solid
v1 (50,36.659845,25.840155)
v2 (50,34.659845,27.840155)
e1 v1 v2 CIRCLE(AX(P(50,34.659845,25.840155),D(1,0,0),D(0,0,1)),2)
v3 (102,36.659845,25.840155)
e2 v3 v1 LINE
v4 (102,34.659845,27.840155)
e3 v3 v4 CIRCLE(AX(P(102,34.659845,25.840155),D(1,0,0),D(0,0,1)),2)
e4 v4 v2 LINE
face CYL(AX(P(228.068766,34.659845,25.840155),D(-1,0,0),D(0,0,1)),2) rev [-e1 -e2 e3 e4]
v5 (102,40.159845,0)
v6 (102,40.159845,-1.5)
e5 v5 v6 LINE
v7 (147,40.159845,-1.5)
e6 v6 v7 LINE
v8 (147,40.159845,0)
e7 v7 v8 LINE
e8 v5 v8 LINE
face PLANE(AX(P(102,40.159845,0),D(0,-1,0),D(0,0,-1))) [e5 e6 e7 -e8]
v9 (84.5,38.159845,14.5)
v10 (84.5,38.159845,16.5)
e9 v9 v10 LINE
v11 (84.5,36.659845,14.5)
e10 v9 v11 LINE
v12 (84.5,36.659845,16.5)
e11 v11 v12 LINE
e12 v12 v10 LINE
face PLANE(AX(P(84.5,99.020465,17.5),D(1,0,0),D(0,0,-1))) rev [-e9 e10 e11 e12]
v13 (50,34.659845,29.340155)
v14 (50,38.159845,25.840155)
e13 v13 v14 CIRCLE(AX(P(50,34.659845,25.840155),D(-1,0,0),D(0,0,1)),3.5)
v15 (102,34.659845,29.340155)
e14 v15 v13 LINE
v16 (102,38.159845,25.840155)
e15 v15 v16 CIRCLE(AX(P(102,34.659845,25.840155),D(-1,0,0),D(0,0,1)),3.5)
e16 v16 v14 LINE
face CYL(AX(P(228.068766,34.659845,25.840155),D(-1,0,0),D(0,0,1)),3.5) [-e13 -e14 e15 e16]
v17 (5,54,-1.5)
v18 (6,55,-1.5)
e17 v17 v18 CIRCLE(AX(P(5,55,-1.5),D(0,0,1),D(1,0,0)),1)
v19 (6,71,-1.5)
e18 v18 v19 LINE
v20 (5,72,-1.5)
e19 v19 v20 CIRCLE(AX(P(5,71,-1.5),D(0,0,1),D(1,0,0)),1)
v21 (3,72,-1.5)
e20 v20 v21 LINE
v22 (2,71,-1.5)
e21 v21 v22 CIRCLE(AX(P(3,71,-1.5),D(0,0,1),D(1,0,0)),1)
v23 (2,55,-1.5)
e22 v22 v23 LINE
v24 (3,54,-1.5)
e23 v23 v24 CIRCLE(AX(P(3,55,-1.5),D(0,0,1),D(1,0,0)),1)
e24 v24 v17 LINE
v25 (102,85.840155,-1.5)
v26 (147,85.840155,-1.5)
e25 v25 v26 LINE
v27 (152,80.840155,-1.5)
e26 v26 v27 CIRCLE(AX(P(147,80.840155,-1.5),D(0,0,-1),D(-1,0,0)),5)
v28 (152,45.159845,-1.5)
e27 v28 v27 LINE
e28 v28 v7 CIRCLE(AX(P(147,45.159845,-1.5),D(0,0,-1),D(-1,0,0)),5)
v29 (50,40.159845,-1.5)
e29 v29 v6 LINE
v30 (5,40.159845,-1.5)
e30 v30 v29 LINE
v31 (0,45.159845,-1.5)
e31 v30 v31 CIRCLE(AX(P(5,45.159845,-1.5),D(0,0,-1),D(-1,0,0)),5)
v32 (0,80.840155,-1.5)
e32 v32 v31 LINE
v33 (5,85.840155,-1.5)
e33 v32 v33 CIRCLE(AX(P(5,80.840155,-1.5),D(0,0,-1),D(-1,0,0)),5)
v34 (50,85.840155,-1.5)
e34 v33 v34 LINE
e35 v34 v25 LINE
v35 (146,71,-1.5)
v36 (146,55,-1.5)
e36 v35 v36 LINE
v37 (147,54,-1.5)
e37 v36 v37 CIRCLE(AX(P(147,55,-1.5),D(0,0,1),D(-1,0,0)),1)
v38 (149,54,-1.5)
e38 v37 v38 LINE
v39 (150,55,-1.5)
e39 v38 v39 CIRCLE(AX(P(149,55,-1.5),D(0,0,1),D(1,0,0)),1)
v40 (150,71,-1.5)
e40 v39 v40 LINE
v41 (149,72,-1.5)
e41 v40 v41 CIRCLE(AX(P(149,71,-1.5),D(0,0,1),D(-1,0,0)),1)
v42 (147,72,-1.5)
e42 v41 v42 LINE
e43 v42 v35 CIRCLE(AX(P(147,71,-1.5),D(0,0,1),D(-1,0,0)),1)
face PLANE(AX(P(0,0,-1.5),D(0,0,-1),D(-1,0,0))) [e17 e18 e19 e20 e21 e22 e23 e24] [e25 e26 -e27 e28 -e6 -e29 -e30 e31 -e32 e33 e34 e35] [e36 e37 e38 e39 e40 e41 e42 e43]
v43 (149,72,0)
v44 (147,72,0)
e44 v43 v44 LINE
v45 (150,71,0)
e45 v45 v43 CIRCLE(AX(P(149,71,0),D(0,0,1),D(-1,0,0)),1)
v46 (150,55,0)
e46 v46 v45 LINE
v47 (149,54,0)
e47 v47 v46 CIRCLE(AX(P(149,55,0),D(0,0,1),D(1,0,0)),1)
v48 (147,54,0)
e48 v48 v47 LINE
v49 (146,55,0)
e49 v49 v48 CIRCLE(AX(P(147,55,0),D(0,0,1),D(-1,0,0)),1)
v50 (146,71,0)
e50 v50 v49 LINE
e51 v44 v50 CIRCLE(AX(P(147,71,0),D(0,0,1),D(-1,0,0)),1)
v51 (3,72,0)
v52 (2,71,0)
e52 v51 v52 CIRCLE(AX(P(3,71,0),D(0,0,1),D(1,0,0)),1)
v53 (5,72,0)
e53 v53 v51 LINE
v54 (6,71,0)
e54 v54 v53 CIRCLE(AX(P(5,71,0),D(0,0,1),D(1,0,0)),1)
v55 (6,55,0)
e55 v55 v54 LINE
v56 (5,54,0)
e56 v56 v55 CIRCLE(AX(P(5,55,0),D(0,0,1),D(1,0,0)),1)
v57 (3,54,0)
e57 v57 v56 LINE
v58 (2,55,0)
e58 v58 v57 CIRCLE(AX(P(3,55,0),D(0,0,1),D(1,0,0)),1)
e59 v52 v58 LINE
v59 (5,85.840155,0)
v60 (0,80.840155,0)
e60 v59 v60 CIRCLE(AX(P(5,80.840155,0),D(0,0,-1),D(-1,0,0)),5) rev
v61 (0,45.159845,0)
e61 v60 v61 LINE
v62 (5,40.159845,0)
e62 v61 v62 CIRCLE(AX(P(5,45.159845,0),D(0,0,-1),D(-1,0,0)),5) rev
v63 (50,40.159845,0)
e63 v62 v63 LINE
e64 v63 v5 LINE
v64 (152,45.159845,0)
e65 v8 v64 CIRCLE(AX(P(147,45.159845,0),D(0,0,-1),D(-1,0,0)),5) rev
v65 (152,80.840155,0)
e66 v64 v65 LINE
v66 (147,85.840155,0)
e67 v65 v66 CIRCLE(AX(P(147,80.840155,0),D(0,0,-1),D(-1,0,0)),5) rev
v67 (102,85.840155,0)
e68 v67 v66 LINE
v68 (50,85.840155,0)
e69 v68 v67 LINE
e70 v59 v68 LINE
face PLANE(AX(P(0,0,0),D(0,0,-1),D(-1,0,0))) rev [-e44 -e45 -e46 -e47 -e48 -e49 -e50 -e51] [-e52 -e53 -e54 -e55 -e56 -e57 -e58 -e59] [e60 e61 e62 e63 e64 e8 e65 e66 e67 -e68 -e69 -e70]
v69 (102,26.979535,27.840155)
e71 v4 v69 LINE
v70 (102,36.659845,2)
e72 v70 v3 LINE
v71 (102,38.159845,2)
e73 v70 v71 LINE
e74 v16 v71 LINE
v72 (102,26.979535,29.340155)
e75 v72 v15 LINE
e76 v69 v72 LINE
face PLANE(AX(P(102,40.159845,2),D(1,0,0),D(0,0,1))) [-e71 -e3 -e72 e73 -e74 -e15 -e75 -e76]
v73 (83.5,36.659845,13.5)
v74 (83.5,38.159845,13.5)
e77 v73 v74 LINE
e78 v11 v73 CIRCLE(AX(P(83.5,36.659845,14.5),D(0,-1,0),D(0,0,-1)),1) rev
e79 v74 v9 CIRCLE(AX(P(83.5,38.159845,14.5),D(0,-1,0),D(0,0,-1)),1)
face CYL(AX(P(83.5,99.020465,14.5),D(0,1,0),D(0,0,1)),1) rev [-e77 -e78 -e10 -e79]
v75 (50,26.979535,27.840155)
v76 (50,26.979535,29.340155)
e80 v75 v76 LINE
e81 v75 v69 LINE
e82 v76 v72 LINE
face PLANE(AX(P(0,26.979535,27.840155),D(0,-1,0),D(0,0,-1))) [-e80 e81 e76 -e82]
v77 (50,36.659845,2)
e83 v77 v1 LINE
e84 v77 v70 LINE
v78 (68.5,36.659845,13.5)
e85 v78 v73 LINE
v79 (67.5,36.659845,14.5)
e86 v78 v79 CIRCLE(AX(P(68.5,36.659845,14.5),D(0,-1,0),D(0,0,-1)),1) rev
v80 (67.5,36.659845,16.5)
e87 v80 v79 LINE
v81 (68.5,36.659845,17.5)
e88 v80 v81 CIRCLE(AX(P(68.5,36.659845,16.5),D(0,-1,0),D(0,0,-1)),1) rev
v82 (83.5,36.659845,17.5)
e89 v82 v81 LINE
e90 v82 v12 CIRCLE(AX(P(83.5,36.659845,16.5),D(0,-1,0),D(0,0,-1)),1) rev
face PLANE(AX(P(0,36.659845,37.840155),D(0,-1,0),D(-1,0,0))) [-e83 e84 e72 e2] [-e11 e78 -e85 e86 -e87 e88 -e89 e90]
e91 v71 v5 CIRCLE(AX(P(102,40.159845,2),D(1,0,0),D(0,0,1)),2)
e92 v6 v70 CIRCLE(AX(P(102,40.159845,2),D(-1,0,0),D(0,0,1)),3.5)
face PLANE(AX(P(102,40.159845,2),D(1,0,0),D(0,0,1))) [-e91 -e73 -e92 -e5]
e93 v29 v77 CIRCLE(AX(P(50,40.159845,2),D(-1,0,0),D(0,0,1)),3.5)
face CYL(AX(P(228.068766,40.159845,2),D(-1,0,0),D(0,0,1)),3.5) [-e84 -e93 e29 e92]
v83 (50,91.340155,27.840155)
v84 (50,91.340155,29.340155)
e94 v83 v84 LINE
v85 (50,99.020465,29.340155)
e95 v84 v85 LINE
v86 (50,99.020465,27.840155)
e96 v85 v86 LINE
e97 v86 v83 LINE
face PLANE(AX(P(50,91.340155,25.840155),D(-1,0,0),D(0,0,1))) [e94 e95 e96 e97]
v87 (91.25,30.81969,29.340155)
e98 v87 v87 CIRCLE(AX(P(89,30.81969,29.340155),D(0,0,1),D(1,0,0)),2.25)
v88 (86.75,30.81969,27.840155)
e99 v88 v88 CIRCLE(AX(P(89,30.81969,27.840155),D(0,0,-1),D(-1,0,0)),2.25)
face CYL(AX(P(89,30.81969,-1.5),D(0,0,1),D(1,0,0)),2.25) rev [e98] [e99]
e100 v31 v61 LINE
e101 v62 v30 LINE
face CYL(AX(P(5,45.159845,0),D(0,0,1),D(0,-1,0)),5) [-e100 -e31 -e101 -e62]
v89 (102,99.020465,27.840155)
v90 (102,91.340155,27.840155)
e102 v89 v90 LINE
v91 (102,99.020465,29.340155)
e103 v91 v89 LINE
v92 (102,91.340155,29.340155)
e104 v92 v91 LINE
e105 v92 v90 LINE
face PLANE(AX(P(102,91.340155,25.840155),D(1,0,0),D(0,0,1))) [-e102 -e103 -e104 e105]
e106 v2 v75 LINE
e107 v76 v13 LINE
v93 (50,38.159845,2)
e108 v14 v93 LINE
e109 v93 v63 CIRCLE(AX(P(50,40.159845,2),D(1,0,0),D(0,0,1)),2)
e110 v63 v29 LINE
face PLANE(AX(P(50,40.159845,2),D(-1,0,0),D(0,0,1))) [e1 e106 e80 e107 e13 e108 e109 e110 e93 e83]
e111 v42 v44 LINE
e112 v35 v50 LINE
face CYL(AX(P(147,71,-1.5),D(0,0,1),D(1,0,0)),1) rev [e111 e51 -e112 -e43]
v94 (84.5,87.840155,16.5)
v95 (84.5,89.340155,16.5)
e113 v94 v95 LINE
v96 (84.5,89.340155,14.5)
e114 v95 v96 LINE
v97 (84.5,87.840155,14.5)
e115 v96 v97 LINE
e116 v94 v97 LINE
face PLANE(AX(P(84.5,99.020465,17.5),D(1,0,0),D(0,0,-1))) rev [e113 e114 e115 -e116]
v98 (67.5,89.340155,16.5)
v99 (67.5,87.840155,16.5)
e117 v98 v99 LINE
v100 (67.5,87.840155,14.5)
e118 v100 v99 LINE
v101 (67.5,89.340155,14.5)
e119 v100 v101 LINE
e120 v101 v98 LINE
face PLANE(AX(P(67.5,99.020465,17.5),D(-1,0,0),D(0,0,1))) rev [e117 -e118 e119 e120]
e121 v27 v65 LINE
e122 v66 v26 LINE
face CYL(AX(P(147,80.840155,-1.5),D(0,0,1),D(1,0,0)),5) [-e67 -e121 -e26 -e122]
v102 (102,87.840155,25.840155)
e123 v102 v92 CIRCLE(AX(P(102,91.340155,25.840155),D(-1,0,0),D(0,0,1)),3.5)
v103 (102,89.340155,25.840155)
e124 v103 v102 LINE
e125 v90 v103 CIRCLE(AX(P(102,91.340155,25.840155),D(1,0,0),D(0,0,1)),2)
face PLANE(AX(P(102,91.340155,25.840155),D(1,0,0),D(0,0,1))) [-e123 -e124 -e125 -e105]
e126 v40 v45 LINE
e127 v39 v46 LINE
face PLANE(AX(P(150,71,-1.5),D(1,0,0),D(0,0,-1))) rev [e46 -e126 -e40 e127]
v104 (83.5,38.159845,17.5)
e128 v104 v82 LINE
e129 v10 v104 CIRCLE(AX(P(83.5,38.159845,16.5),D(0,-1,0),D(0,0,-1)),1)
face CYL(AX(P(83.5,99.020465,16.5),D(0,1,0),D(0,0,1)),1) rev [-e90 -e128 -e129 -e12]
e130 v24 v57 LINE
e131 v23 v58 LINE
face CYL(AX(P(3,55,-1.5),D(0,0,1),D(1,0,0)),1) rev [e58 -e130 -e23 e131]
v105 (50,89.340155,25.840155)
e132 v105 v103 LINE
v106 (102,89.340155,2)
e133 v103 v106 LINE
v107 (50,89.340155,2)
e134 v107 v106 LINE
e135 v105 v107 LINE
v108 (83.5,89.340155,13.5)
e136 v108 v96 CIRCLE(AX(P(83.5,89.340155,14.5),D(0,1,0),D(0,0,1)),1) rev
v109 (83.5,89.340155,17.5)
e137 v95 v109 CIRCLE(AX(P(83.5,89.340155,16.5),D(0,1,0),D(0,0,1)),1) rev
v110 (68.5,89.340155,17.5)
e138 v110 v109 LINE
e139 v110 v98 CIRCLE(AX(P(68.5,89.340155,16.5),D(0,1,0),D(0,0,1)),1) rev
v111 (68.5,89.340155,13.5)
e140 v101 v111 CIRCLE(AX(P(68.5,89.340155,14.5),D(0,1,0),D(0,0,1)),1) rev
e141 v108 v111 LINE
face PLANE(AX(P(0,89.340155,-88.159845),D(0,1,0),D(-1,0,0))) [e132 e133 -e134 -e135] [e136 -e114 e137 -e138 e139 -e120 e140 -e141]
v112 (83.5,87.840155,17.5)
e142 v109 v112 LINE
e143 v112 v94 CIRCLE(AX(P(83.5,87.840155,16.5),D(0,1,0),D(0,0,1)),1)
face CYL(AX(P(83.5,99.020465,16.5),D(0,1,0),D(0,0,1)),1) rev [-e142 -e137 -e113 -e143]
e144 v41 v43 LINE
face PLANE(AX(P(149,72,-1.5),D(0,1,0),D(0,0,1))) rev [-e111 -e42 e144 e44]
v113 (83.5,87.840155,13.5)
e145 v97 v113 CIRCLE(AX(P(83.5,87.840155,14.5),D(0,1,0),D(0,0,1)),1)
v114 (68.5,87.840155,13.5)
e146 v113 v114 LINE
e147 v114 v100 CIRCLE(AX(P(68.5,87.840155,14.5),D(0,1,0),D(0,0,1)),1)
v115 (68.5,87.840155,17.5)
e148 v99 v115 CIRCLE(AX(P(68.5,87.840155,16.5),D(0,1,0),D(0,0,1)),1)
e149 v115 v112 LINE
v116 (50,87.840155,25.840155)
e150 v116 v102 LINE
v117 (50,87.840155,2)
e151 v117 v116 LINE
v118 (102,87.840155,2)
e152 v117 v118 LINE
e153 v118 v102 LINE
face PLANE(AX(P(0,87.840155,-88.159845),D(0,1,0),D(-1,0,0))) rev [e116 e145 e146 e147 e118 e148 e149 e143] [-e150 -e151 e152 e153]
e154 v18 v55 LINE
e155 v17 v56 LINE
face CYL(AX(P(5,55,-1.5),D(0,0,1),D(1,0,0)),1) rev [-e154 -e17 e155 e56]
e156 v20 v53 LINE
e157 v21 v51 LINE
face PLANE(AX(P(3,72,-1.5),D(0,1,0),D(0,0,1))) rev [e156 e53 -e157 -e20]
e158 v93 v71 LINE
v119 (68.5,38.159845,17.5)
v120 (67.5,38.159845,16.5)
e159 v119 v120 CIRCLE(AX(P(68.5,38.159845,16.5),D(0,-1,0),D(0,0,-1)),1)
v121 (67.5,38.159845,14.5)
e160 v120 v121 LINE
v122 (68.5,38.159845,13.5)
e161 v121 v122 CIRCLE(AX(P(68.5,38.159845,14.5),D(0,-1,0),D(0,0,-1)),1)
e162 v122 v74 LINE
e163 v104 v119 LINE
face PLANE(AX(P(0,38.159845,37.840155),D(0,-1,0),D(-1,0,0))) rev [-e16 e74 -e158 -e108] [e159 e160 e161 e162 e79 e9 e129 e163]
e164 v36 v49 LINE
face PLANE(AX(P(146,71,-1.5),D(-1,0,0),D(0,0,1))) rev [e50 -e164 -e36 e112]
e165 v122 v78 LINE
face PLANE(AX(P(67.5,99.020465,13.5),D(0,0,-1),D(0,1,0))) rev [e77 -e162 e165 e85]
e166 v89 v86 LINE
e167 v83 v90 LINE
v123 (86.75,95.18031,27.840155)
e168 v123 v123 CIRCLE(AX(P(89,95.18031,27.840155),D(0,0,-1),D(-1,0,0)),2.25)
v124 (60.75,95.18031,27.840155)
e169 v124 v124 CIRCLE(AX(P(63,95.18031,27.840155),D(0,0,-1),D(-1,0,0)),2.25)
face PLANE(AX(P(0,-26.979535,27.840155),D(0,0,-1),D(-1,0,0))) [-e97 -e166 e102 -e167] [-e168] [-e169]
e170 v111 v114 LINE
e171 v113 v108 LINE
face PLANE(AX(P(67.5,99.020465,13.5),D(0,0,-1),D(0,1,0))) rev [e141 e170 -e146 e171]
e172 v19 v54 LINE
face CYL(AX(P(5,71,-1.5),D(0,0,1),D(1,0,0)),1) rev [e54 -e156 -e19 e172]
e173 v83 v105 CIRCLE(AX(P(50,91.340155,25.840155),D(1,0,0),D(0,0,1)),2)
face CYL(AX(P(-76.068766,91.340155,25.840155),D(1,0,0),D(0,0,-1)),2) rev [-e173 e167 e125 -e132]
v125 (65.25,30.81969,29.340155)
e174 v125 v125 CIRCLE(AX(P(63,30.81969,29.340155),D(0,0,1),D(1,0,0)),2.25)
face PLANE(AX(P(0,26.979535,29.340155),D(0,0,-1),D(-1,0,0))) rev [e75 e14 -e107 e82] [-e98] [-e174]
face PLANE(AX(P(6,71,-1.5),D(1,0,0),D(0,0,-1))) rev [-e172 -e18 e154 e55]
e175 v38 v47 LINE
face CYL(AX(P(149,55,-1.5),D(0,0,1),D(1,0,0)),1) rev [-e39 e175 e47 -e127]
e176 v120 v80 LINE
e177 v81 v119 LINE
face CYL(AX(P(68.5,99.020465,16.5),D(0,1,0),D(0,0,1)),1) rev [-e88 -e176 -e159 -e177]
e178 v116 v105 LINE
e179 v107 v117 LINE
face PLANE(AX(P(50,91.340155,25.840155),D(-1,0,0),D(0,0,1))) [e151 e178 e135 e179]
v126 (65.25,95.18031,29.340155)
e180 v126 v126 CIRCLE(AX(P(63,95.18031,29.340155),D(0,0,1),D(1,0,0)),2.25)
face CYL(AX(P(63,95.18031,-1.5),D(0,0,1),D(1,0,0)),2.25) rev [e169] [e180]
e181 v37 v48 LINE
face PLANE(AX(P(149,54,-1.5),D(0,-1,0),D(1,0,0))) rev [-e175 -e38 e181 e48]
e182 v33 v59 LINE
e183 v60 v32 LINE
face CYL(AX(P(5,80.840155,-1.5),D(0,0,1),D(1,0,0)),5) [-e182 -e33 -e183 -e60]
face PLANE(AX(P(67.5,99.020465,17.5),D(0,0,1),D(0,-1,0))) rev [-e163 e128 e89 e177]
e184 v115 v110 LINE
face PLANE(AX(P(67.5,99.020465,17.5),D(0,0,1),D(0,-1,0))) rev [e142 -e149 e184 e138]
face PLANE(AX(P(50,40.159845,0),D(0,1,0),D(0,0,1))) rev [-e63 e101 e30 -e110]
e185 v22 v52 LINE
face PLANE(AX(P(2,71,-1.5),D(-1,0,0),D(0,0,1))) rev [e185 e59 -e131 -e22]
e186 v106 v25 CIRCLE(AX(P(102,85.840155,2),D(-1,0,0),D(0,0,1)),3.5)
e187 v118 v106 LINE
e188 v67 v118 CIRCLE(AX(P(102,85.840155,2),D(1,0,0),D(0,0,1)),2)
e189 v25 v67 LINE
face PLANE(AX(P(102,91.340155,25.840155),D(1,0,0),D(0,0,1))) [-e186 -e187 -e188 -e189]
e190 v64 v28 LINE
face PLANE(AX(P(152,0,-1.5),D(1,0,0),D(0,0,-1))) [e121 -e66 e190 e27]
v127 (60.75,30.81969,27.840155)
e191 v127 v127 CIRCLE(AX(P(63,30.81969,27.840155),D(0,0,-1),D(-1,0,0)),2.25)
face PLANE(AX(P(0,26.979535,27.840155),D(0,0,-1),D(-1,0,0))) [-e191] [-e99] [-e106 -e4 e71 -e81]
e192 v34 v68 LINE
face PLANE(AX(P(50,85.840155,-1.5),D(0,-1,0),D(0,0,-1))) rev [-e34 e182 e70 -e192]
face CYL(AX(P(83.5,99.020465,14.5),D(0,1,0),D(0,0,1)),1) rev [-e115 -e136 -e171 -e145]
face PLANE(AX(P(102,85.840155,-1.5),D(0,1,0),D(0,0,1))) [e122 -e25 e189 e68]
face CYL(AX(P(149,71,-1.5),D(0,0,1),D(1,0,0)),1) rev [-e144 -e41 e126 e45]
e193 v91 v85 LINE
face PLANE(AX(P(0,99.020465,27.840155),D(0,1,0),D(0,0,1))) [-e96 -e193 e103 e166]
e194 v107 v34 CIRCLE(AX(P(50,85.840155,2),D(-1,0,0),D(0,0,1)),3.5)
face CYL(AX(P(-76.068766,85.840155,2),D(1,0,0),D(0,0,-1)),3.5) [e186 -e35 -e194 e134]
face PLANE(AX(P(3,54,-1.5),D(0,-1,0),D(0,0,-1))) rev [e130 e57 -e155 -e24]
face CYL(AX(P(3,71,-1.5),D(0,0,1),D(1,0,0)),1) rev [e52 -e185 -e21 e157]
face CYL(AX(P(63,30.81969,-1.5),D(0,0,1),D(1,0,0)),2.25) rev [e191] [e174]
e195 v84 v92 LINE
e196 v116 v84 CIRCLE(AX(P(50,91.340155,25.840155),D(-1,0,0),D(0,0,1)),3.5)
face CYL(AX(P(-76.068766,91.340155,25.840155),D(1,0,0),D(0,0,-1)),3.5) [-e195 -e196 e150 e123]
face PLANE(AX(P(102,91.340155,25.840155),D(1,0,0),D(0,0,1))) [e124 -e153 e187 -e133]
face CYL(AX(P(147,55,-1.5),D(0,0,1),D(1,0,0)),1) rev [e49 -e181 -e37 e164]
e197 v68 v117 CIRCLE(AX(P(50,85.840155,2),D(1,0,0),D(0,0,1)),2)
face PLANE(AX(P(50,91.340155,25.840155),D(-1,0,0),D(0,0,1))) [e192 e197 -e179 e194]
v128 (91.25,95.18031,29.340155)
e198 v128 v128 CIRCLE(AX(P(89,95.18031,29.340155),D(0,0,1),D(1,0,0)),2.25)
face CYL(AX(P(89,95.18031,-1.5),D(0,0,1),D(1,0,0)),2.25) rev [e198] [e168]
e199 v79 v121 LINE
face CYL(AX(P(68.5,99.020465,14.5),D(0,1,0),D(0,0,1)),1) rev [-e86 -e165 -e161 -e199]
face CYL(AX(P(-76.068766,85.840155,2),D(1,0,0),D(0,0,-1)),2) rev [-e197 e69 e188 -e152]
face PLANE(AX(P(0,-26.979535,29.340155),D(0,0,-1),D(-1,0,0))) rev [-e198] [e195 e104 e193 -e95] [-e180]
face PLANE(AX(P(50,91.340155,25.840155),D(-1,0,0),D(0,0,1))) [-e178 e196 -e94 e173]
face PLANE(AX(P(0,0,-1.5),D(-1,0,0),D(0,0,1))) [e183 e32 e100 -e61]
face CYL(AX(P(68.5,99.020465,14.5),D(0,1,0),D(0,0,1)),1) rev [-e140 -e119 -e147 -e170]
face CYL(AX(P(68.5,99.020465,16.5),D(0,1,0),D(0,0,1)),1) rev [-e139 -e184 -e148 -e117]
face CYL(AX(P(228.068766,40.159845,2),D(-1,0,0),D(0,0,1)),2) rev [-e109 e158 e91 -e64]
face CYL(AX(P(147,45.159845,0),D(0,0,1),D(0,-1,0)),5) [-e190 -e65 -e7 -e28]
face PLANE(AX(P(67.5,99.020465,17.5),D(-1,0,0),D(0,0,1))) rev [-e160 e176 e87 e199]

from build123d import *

# Parameters (mm, degrees)
SKIZZE1_W                            = 152
SKIZZE1_H                            = 126
BASIS_BLECH1_DEPTH                   = 1.5
SKIZZIERTE_BIEGUNG2_DEPTH            = 152
SKIZZIERTE_BIEGUNG2_2_DEPTH          = 152
SKIZZIERTE_BIEGUNG3_DEPTH            = 152
SKIZZIERTE_BIEGUNG3_2_DEPTH          = 152
SKIZZIERTE_BIEGUNG4_DEPTH            = 152
SKIZZIERTE_BIEGUNG4_2_DEPTH          = 152
SCHNITT_LINEAR_AUSTRAGEN1_DEPTH      = 50
SCHNITT_LINEAR_AUSTRAGEN2_DEPTH      = 167.894252898
SCHNITT_LINEAR_AUSTRAGEN2_DEPTH_BACK = 167.894252898
SKIZZE15_W                           = 17
SKIZZE15_H                           = 4
SKIZZE22_R                           = 2.25
SCHNITT_LINEAR_AUSTRAGEN4_DEPTH      = 185.011324876
VERRUNDUNG3_R                        = 1
VERRUNDUNG4_R                        = 5
SCHNITT_LINEAR_AUSTRAGEN5_DEPTH      = 184.765876096


# Read off the part's stored shape, not the designer's step: Skizzierte Biegung2, Skizzierte Biegung3, Skizzierte Biegung4
# Sheet-metal steps are written as plain solids
with BuildPart() as part:
    # Skizze1 → Basis-Blech1 (new body)
    with BuildSketch(Plane.XY):
        with Locations((76, 63)):
            Rectangle(SKIZZE1_W, SKIZZE1_H)
    extrude(amount=-BASIS_BLECH1_DEPTH)

    # Skizzierte Biegung2 outline → Skizzierte Biegung2 (cut)
    with BuildSketch(Plane.YZ):
        with BuildLine():
            ThreePointArc((88.712436374, 0), (87.460340225, -1.102418411), (85.840155051, -1.5))
            Line((85.840155051, -1.5), (126, -1.5))
            Line((126, -1.5), (126, 0))
            Line((126, 0), (88.712436374, 0))
        make_face()
        with BuildLine():
            Line((0, -1.5), (40.159844949, -1.5))
            ThreePointArc((40.159844949, -1.5), (38.539659775, -1.102418411), (37.287563626, 0))
            Line((37.287563626, 0), (0, 0))
            Line((0, 0), (0, -1.5))
        make_face()
    extrude(amount=SKIZZIERTE_BIEGUNG2_DEPTH, mode=Mode.SUBTRACT)

    # Skizzierte Biegung2 2 outline → Skizzierte Biegung2 2 (add)
    with BuildSketch(Plane.YZ):
        with BuildLine():
            Line((85.840155051, 0), (88.712436374, 0))
            ThreePointArc((88.712436374, 0), (89.179540071, 0.951902827), (89.340155051, 2))
            Line((89.340155051, 2), (89.340155051, 37.840155051))
            Line((89.340155051, 37.840155051), (87.840155051, 37.840155051))
            Line((87.840155051, 37.840155051), (87.840155051, 2))
            ThreePointArc((87.840155051, 2), (87.254368613, 0.585786438), (85.840155051, 0))
        make_face()
        with BuildLine():
            ThreePointArc((36.659844949, 2), (36.820459929, 0.951902827), (37.287563626, 0))
            Line((37.287563626, 0), (40.159844949, 0))
            ThreePointArc((40.159844949, 0), (38.745631387, 0.585786438), (38.159844949, 2))
            Line((38.159844949, 2), (38.159844949, 37.840155051))
            Line((38.159844949, 37.840155051), (36.659844949, 37.840155051))
            Line((36.659844949, 37.840155051), (36.659844949, 2))
        make_face()
    extrude(amount=SKIZZIERTE_BIEGUNG2_2_DEPTH)

    # Skizzierte Biegung3 outline → Skizzierte Biegung3 (cut)
    with BuildSketch(Plane.YZ):
        with BuildLine():
            ThreePointArc((87.840155051, 25.840155051), (88.23773664, 27.460340225), (89.340155051, 28.712436374))
            Line((89.340155051, 28.712436374), (89.340155051, 37.840155051))
            Line((89.340155051, 37.840155051), (87.840155051, 37.840155051))
            Line((87.840155051, 37.840155051), (87.840155051, 25.840155051))
        make_face()
    extrude(amount=SKIZZIERTE_BIEGUNG3_DEPTH, mode=Mode.SUBTRACT)

    # Skizzierte Biegung3 2 outline → Skizzierte Biegung3 2 (add)
    with BuildSketch(Plane.YZ):
        with BuildLine():
            ThreePointArc((89.340155051, 25.840155051), (89.925941489, 27.254368613), (91.340155051, 27.840155051))
            Line((91.340155051, 27.840155051), (99.020465152, 27.840155051))
            Line((99.020465152, 27.840155051), (99.020465152, 29.340155051))
            Line((99.020465152, 29.340155051), (91.340155051, 29.340155051))
            ThreePointArc((91.340155051, 29.340155051), (90.292057878, 29.179540071), (89.340155051, 28.712436374))
            Line((89.340155051, 28.712436374), (89.340155051, 25.840155051))
        make_face()
    extrude(amount=SKIZZIERTE_BIEGUNG3_2_DEPTH)

    # Skizzierte Biegung4 outline → Skizzierte Biegung4 (cut)
    with BuildSketch(Plane.YZ):
        with BuildLine():
            Line((36.659844949, 37.840155051), (36.659844949, 28.712436374))
            ThreePointArc((36.659844949, 28.712436374), (37.76226336, 27.460340225), (38.159844949, 25.840155051))
            Line((38.159844949, 25.840155051), (38.159844949, 37.840155051))
            Line((38.159844949, 37.840155051), (36.659844949, 37.840155051))
        make_face()
    extrude(amount=SKIZZIERTE_BIEGUNG4_DEPTH, mode=Mode.SUBTRACT)

    # Skizzierte Biegung4 2 outline → Skizzierte Biegung4 2 (add)
    with BuildSketch(Plane.YZ):
        with BuildLine():
            Line((26.979534848, 29.340155051), (26.979534848, 27.840155051))
            Line((26.979534848, 27.840155051), (34.659844949, 27.840155051))
            ThreePointArc((34.659844949, 27.840155051), (36.074058511, 27.254368614), (36.659844949, 25.840155051))
            Line((36.659844949, 25.840155051), (36.659844949, 28.712436374))
            ThreePointArc((36.659844949, 28.712436374), (35.707942122, 29.179540071), (34.659844949, 29.340155051))
            Line((34.659844949, 29.340155051), (26.979534848, 29.340155051))
        make_face()
    extrude(amount=SKIZZIERTE_BIEGUNG4_2_DEPTH)

    # Skizze14 → Schnitt-Linear austragen1 (cut)
    with BuildSketch(Plane.ZY):
        with BuildLine():
            Line((29.340155051, 91.340155051), (29.340155051, 99.020465152))
            Line((29.340155051, 99.020465152), (27.840155051, 99.020465152))
            Line((27.840155051, 99.020465152), (27.840155051, 91.340155051))
            ThreePointArc((27.840155051, 91.340155051), (27.254368613, 89.925941488), (25.840155051, 89.340155051))
            Line((25.840155051, 89.340155051), (2, 89.340155051))
            ThreePointArc((2, 89.340155051), (-0.474873734, 88.315028785), (-1.5, 85.840155051))
            Line((-1.5, 85.840155051), (0, 85.840155051))
            ThreePointArc((0, 85.840155051), (0.585786438, 87.254368613), (2, 87.840155051))
            Line((2, 87.840155051), (25.840155051, 87.840155051))
            ThreePointArc((25.840155051, 87.840155051), (28.315028785, 88.865281317), (29.340155051, 91.340155051))
        make_face()
        with BuildLine():
            Line((0, 40.159844949), (-1.5, 40.159844949))
            ThreePointArc((-1.5, 40.159844949), (-0.474873734, 37.684971215), (2, 36.659844949))
            Line((2, 36.659844949), (25.840155051, 36.659844949))
            ThreePointArc((25.840155051, 36.659844949), (27.254368613, 36.074058512), (27.840155051, 34.659844949))
            Line((27.840155051, 34.659844949), (27.840155051, 26.979534848))
            Line((27.840155051, 26.979534848), (29.340155051, 26.979534848))
            Line((29.340155051, 26.979534848), (29.340155051, 34.659844949))
            ThreePointArc((29.340155051, 34.659844949), (28.315028785, 37.134718683), (25.840155051, 38.159844949))
            Line((25.840155051, 38.159844949), (2, 38.159844949))
            ThreePointArc((2, 38.159844949), (0.585786438, 38.745631387), (0, 40.159844949))
        make_face()
    schnitt_linear_austragen1 = extrude(amount=-SCHNITT_LINEAR_AUSTRAGEN1_DEPTH, mode=Mode.SUBTRACT)

    # Spiegeln1: Schnitt-Linear austragen1 across plane
    add(schnitt_linear_austragen1.mirror(Plane(origin=(76, 0, 0), x_dir=(0, 0, 1), z_dir=(1, 0, 0))), mode=Mode.SUBTRACT)

    # Skizze15 → Schnitt-Linear austragen2 (cut, two sides: drawn at the far end of the back side and taken through both)
    with BuildSketch(Plane.XZ.offset(-36.659844949).offset(-SCHNITT_LINEAR_AUSTRAGEN2_DEPTH_BACK)):
        with Locations((76, 15.5)):
            Rectangle(SKIZZE15_W, SKIZZE15_H)
    extrude(amount=SCHNITT_LINEAR_AUSTRAGEN2_DEPTH + SCHNITT_LINEAR_AUSTRAGEN2_DEPTH_BACK, mode=Mode.SUBTRACT)

    # Skizze22 → Schnitt-Linear austragen4 (cut, through all)
    with BuildSketch(Plane.XY.offset(29.340155051)):
        with Locations((63, 95.180310101)):
            Circle(SKIZZE22_R)
        with Locations((89, 95.180310101)):
            Circle(SKIZZE22_R)
        with Locations((63, 30.819689899)):
            Circle(SKIZZE22_R)
        with Locations((89, 30.819689899)):
            Circle(SKIZZE22_R)
    extrude(amount=-SCHNITT_LINEAR_AUSTRAGEN4_DEPTH, mode=Mode.SUBTRACT)

    # Verrundung3
    verrundung3_edges = [part.edges().sort_by_distance(p)[0] for p in [
        (67.5, 88.590155051, 13.5),
        (67.5, 37.409844949, 13.5),
        (67.5, 88.590155051, 17.5),
        (67.5, 37.409844949, 17.5),
        (84.5, 88.590155051, 17.5),
        (84.5, 37.409844949, 17.5),
        (84.5, 88.590155051, 13.5),
        (84.5, 37.409844949, 13.5),
    ]]
    fillet(verrundung3_edges, radius=VERRUNDUNG3_R)

    # Verrundung4
    verrundung4_edges = [part.edges().sort_by_distance(p)[0] for p in [
        (0, 85.840155051, -0.75),
        (152, 85.840155051, -0.75),
        (152, 40.159844949, -0.75),
        (0, 40.159844949, -0.75),
    ]]
    fillet(verrundung4_edges, radius=VERRUNDUNG4_R)

    # Skizze23 → Schnitt-Linear austragen5 (cut, through all)
    with BuildSketch(Plane.XY):
        with BuildLine():
            Line((3, 72), (5, 72))
            ThreePointArc((5, 72), (5.707106781, 71.707106781), (6, 71))
            Line((6, 71), (6, 55))
            ThreePointArc((6, 55), (5.707106781, 54.292893219), (5, 54))
            Line((5, 54), (3, 54))
            ThreePointArc((3, 54), (2.292893219, 54.292893219), (2, 55))
            Line((2, 55), (2, 71))
            ThreePointArc((2, 71), (2.292893219, 71.707106781), (3, 72))
        make_face()
        with BuildLine():
            Line((149, 72), (147, 72))
            ThreePointArc((147, 72), (146.292893219, 71.707106781), (146, 71))
            Line((146, 71), (146, 55))
            ThreePointArc((146, 55), (146.292893219, 54.292893219), (147, 54))
            Line((147, 54), (149, 54))
            ThreePointArc((149, 54), (149.707106781, 54.292893219), (150, 55))
            Line((150, 55), (150, 71))
            ThreePointArc((150, 71), (149.707106781, 71.707106781), (149, 72))
        make_face()
    extrude(amount=-SCHNITT_LINEAR_AUSTRAGEN5_DEPTH, mode=Mode.SUBTRACT)


solid = part.part
